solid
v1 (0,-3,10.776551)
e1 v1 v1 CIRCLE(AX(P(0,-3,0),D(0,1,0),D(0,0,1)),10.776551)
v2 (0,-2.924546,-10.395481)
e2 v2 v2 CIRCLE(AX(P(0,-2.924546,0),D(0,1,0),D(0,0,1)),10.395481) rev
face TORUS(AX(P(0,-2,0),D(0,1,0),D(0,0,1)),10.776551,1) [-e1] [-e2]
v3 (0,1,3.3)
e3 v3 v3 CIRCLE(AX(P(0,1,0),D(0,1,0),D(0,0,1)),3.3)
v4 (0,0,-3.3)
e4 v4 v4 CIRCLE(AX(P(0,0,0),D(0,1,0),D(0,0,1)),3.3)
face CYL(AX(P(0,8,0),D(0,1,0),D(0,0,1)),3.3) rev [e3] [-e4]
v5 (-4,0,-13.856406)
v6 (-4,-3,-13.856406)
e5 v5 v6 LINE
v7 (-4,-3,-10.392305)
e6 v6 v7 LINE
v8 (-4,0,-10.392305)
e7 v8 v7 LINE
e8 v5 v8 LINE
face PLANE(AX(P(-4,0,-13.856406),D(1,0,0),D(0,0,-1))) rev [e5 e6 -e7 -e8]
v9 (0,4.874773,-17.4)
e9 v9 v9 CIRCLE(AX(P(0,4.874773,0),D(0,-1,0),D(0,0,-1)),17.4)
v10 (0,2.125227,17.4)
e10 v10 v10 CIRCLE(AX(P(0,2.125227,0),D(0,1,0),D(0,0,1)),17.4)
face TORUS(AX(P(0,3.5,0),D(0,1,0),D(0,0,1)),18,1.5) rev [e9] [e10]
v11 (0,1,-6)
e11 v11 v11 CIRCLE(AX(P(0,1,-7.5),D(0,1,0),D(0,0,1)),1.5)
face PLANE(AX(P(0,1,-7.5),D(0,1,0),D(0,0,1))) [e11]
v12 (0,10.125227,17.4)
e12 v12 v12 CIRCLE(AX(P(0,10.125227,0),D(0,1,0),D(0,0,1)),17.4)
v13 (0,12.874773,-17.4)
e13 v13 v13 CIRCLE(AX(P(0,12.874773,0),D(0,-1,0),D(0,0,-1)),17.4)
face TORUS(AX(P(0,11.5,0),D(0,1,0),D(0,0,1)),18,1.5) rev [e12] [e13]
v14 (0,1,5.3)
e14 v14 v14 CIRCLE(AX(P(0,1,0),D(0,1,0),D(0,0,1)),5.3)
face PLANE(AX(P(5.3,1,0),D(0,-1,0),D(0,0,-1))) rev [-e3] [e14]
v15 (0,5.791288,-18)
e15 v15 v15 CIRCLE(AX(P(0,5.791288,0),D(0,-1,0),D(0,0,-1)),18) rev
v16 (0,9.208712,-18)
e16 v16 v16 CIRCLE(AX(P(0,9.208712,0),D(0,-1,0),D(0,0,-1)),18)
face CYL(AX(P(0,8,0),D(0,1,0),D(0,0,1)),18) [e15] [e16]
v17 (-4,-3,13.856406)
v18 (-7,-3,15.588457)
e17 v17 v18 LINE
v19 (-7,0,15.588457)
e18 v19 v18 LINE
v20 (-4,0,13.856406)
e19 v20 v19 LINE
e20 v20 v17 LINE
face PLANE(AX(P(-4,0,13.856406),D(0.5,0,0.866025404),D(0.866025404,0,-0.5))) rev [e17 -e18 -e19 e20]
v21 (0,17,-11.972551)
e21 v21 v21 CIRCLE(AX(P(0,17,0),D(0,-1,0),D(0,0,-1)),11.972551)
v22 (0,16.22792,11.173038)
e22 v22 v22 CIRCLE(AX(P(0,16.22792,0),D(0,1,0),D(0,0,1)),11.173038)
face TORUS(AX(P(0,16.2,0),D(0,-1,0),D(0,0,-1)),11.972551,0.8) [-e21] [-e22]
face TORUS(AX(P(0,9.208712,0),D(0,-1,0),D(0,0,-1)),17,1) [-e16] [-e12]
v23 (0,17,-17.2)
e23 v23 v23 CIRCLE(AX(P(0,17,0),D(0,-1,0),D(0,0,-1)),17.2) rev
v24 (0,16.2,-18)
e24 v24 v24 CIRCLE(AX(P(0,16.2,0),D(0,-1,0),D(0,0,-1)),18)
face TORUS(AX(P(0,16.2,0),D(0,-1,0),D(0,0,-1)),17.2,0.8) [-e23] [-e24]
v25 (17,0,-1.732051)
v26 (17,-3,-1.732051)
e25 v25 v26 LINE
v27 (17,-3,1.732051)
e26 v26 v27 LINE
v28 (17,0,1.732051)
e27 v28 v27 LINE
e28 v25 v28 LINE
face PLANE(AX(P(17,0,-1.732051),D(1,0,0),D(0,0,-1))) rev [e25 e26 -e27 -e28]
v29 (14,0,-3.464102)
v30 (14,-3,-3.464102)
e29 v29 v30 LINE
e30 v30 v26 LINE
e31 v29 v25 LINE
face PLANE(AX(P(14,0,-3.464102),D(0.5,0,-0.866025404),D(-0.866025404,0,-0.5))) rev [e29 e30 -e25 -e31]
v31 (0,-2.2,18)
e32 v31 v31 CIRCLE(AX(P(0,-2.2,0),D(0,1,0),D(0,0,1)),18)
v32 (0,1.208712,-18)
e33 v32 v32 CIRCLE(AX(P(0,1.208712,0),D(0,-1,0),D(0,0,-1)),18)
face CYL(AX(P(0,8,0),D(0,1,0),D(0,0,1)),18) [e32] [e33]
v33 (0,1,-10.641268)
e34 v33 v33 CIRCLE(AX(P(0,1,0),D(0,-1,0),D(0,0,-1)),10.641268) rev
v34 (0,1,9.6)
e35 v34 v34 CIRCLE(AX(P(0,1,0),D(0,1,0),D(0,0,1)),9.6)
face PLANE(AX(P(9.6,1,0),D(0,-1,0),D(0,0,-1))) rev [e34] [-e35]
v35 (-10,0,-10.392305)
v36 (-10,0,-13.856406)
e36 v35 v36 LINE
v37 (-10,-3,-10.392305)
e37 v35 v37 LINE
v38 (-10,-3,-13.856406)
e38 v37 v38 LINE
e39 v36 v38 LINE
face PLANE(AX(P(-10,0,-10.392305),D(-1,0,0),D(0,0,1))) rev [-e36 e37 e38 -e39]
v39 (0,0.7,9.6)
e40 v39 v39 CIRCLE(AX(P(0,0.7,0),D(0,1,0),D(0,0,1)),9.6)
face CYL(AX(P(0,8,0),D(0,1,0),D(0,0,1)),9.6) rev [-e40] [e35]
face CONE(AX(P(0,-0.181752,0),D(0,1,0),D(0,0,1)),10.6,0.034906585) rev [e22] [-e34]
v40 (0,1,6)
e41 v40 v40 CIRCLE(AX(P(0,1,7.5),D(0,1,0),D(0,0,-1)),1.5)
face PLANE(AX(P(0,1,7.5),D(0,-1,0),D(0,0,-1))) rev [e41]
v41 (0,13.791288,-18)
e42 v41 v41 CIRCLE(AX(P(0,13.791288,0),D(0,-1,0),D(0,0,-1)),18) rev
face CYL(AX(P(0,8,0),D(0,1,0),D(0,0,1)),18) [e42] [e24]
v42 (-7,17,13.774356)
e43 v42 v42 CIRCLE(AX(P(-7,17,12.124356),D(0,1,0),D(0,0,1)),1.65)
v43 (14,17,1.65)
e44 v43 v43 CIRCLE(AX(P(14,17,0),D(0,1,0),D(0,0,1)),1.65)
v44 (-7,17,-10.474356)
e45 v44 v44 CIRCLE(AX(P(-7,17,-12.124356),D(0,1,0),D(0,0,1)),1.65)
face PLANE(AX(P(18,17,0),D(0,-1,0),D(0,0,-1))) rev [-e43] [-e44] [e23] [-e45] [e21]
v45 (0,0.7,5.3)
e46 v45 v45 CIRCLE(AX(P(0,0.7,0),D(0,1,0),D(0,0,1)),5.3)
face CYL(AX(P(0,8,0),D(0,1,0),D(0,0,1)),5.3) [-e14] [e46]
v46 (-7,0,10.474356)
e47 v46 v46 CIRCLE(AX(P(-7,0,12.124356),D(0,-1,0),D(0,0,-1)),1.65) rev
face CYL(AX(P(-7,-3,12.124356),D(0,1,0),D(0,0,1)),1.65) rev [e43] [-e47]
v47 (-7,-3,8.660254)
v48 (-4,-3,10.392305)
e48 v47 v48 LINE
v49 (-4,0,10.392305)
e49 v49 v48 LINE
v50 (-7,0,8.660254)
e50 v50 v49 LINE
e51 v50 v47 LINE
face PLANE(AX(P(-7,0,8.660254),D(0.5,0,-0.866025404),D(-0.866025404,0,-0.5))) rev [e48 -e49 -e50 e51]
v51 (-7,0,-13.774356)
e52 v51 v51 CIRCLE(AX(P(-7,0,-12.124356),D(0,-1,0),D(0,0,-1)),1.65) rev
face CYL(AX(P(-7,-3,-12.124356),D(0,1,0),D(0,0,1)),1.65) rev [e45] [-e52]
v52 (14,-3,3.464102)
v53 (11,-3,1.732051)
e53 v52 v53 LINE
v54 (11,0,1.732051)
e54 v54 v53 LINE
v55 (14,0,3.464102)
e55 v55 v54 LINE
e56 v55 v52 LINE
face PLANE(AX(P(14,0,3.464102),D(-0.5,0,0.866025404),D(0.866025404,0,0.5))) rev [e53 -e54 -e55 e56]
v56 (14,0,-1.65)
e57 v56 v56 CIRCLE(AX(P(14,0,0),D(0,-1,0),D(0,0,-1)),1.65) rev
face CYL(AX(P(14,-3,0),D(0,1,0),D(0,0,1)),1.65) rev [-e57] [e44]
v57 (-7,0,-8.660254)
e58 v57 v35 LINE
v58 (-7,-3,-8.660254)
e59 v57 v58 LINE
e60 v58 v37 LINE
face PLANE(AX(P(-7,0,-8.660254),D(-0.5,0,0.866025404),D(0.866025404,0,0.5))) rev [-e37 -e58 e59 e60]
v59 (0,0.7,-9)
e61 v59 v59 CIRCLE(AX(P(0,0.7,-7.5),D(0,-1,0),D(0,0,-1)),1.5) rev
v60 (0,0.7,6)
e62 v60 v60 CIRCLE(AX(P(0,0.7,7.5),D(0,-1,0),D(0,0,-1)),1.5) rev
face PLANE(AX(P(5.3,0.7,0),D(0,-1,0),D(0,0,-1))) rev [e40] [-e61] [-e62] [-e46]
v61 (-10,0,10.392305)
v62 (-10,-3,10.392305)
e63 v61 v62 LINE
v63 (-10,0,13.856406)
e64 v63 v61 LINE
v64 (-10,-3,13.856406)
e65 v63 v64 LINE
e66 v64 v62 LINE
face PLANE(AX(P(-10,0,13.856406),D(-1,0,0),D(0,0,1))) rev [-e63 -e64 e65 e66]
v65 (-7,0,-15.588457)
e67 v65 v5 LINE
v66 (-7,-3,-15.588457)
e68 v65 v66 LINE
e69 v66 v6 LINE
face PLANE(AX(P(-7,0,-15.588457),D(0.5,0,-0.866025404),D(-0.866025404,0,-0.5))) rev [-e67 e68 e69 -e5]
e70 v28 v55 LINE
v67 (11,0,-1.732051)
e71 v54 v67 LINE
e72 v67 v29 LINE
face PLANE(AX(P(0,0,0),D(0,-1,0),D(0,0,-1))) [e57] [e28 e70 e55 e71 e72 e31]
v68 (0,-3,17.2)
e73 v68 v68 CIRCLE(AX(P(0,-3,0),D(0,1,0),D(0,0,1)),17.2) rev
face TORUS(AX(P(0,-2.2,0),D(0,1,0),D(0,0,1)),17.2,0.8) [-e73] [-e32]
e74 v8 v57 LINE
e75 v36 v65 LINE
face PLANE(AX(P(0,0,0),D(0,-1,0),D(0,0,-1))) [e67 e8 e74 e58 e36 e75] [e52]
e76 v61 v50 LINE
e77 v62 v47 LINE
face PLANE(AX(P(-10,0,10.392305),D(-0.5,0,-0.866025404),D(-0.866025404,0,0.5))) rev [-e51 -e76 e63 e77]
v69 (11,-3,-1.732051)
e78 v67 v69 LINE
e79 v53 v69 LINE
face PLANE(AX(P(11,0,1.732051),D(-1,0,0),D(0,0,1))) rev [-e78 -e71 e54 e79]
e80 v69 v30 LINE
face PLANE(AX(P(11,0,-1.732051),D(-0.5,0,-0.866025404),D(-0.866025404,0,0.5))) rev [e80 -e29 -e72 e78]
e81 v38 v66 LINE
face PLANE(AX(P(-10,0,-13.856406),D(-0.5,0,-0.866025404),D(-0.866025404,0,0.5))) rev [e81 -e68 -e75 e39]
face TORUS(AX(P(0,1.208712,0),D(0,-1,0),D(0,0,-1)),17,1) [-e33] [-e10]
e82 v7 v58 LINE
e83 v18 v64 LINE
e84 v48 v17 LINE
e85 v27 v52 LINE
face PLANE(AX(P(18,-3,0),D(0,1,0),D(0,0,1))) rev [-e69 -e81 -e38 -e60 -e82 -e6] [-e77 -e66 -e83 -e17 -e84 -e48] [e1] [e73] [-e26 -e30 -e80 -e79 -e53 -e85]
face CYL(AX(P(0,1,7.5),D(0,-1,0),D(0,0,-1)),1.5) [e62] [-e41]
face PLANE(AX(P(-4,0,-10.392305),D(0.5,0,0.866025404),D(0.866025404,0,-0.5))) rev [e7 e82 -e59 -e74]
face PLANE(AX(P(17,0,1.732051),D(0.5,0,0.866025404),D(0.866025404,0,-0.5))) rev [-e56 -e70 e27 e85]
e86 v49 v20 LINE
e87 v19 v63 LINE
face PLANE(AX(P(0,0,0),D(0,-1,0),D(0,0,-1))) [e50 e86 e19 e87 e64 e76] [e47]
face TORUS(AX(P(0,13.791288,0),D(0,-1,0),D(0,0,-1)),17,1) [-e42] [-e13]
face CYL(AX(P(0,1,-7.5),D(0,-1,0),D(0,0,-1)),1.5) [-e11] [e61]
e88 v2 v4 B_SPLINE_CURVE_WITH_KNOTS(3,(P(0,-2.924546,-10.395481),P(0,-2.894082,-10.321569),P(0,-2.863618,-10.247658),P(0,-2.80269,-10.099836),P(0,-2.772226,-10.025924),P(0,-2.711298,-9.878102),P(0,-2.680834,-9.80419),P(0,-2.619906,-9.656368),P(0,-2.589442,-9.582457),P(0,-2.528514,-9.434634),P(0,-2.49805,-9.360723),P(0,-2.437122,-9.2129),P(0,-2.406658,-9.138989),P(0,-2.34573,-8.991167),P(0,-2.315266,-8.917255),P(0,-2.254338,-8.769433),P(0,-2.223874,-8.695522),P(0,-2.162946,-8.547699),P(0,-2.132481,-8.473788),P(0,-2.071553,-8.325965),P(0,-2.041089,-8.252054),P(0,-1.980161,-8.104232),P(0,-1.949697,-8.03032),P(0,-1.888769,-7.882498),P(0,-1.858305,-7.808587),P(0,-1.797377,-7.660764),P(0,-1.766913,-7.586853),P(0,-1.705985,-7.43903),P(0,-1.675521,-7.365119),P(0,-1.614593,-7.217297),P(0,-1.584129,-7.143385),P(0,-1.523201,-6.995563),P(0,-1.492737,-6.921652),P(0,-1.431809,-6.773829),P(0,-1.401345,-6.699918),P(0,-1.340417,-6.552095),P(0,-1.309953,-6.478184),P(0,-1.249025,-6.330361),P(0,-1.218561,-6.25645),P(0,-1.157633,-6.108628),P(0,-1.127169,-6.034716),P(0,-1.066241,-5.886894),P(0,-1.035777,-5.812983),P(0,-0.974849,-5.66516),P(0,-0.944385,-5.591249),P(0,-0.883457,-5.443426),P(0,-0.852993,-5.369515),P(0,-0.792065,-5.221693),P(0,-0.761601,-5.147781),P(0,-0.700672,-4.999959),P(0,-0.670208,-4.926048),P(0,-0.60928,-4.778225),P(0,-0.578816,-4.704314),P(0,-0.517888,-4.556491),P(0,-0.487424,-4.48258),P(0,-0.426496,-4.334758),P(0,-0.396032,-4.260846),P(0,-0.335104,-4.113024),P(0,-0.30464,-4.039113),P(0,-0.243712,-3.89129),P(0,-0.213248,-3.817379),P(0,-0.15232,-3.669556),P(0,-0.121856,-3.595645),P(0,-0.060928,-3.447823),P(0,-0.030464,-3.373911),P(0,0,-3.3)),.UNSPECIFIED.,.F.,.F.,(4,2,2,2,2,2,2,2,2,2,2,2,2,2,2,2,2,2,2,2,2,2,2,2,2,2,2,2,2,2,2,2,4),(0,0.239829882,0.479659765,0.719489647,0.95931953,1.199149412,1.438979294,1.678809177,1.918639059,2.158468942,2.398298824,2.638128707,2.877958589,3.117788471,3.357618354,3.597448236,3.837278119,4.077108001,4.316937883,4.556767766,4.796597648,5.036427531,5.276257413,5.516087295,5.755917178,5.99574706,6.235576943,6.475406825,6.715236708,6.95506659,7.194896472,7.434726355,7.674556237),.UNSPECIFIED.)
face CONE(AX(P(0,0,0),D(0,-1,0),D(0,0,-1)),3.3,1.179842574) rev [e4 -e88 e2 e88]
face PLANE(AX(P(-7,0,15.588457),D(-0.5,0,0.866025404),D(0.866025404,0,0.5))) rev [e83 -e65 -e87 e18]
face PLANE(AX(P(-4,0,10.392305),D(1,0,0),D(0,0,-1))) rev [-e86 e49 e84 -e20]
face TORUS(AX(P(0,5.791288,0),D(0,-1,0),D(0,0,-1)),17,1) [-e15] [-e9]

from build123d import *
from OCP.BRepFilletAPI import BRepFilletAPI_MakeFillet

# Parameters (mm, degrees)
ESQUISSE2_R             = 1.65
ENL_V_MAT_EXTRU_1_DEPTH = 33.372828112
ENL_V_MAT_EXTRU_2_DEPTH = 3
CHANFREIN1_SIZE         = 0.6
CHANFREIN1_SIZE_2       = 17.18175197
CONG_1_R1               = 1
CONG_1_R2               = 0.8
ESQUISSE4_R             = 1.5
BOSS_EXTRU_1_DEPTH      = 0.3
CONG_3_R                = 1


with BuildPart() as part:
    # Esquisse1 → Révolution1 (revolve)
    with BuildSketch(Plane.XY, mode=Mode.PRIVATE) as r_volution1_sk:
        with BuildLine():
            Line((18, 17), (10.6, 17))
            Line((10.6, 17), (10.6, 1))
            Line((10.6, 1), (9.6, 1))
            Line((9.6, 1), (9.6, 0.7))
            Line((9.6, 0.7), (5.3, 0.7))
            Line((5.3, 0.7), (5.3, 1))
            Line((5.3, 1), (3.3, 1))
            Line((3.3, 1), (3.3, 0))
            Line((3.3, 0), (10.578545573, -3))
            Line((10.578545573, -3), (18, -3))
            Line((18, -3), (18, 2))
            ThreePointArc((18, 2), (16.5, 3.5), (18, 5))
            Line((18, 5), (18, 10))
            ThreePointArc((18, 10), (16.5, 11.5), (18, 13))
            Line((18, 13), (18, 17))
        make_face()
    revolve(r_volution1_sk.sketch.rotate(Axis((0, 8, 0), (0, -1, 0)), 90), axis=Axis((0, 8, 0), (0, -1, 0)))

    # Esquisse2 → Enlèv. mat.-Extru.1 (cut, through all)
    with BuildSketch(Plane(origin=(0, 17, 0), x_dir=(1, 0, 0), z_dir=(0, 1, 0))):
        with Locations(Location((14, 0, 0), (0, 0, 270))):
            Circle(ESQUISSE2_R)
        with Locations(Location((-7, -12.124355653, 0), (0, 0, 270))):
            Circle(ESQUISSE2_R)
        with Locations(Location((-7, 12.124355653, 0), (0, 0, 270))):
            Circle(ESQUISSE2_R)
    extrude(amount=-ENL_V_MAT_EXTRU_1_DEPTH, mode=Mode.SUBTRACT)

    # Esquisse3 → Enlèv. mat.-Extru.2 (cut)
    with BuildSketch(Plane.XZ.offset(3)):
        Polygon((14, -3.464101615), (17, -1.732050808), (17, 1.732050808), (14, 3.464101615), (11, 1.732050808), (11, -1.732050808), align=None)
        Polygon((-7, -8.660254038), (-10, -10.392304845), (-10, -13.856406461), (-7, -15.588457268), (-4, -13.856406461), (-4, -10.392304845), align=None)
        Polygon((-4, 10.392304845), (-4, 13.856406461), (-7, 15.588457268), (-10, 13.856406461), (-10, 10.392304845), (-7, 8.660254038), align=None)
    extrude(amount=-ENL_V_MAT_EXTRU_2_DEPTH, mode=Mode.SUBTRACT)

    # Chanfrein1
    # the kernel refuses this chamfer: 17.18175197, 0.6 mm, written as the material it takes off along each edge
    with BuildSketch(Plane(origin=(0, 17, 0), x_dir=(0, 0, 1), z_dir=(1, 0, 0))) as chanfrein1_piece_1_section:
        Polygon((10.6 + CHANFREIN1_SIZE, 0), (10.6, CHANFREIN1_SIZE_2), (10.6, 0), align=None)
    chanfrein1_piece_1 = revolve(axis=Axis((0, 17, 0), (0, -1, 0)), mode=Mode.PRIVATE)
    chanfrein1_piece_1 = split(chanfrein1_piece_1, bisect_by=Plane(origin=(0, 1, -10.842656471), z_dir=(0, 1, 0)), keep=Keep.TOP, mode=Mode.PRIVATE)
    add(chanfrein1_piece_1, mode=Mode.SUBTRACT)

    # Congé1: one fillet with a radius per group of edges: ONE call of the kernel's fillet builder (fillet() takes one radius for all edges)
    cong_1_edges_1 = [part.edges().sort_by_distance(p)[0] for p in [
        (0, -3, -10.578545573),
    ]]
    cong_1_edges_2 = [part.edges().sort_by_distance(p)[0] for p in [
        (0, 17, -11.2),
        (0, -3, -18),
        (0, 17, -18),
    ]]
    cong_1 = BRepFilletAPI_MakeFillet(part.part.solid().wrapped)
    for e in cong_1_edges_1:
        cong_1.Add(CONG_1_R1, e.wrapped)
    for e in cong_1_edges_2:
        cong_1.Add(CONG_1_R2, e.wrapped)
    add(Compound.cast(cong_1.Shape()), mode=Mode.REPLACE)

    # Esquisse4 → Boss.-Extru.1 (add)
    with BuildSketch(Plane(origin=(0, 0.7, 0), x_dir=(1, 0, 0), z_dir=(0, 1, 0))):
        with Locations(Location((0, 7.5, 0), (0, 0, 90))):
            Circle(ESQUISSE4_R)
        with Locations(Location((0, -7.5, 0), (0, 0, 90))):
            Circle(ESQUISSE4_R)
    extrude(amount=BOSS_EXTRU_1_DEPTH)

    # Congé3
    cong_3_edges = [part.edges().sort_by_distance(p)[0] for p in [
        (0, 2, -18),
        (0, 13, -18),
        (0, 10, -18),
        (0, 5, -18),
    ]]
    fillet(cong_3_edges, radius=CONG_3_R)


solid = part.part
